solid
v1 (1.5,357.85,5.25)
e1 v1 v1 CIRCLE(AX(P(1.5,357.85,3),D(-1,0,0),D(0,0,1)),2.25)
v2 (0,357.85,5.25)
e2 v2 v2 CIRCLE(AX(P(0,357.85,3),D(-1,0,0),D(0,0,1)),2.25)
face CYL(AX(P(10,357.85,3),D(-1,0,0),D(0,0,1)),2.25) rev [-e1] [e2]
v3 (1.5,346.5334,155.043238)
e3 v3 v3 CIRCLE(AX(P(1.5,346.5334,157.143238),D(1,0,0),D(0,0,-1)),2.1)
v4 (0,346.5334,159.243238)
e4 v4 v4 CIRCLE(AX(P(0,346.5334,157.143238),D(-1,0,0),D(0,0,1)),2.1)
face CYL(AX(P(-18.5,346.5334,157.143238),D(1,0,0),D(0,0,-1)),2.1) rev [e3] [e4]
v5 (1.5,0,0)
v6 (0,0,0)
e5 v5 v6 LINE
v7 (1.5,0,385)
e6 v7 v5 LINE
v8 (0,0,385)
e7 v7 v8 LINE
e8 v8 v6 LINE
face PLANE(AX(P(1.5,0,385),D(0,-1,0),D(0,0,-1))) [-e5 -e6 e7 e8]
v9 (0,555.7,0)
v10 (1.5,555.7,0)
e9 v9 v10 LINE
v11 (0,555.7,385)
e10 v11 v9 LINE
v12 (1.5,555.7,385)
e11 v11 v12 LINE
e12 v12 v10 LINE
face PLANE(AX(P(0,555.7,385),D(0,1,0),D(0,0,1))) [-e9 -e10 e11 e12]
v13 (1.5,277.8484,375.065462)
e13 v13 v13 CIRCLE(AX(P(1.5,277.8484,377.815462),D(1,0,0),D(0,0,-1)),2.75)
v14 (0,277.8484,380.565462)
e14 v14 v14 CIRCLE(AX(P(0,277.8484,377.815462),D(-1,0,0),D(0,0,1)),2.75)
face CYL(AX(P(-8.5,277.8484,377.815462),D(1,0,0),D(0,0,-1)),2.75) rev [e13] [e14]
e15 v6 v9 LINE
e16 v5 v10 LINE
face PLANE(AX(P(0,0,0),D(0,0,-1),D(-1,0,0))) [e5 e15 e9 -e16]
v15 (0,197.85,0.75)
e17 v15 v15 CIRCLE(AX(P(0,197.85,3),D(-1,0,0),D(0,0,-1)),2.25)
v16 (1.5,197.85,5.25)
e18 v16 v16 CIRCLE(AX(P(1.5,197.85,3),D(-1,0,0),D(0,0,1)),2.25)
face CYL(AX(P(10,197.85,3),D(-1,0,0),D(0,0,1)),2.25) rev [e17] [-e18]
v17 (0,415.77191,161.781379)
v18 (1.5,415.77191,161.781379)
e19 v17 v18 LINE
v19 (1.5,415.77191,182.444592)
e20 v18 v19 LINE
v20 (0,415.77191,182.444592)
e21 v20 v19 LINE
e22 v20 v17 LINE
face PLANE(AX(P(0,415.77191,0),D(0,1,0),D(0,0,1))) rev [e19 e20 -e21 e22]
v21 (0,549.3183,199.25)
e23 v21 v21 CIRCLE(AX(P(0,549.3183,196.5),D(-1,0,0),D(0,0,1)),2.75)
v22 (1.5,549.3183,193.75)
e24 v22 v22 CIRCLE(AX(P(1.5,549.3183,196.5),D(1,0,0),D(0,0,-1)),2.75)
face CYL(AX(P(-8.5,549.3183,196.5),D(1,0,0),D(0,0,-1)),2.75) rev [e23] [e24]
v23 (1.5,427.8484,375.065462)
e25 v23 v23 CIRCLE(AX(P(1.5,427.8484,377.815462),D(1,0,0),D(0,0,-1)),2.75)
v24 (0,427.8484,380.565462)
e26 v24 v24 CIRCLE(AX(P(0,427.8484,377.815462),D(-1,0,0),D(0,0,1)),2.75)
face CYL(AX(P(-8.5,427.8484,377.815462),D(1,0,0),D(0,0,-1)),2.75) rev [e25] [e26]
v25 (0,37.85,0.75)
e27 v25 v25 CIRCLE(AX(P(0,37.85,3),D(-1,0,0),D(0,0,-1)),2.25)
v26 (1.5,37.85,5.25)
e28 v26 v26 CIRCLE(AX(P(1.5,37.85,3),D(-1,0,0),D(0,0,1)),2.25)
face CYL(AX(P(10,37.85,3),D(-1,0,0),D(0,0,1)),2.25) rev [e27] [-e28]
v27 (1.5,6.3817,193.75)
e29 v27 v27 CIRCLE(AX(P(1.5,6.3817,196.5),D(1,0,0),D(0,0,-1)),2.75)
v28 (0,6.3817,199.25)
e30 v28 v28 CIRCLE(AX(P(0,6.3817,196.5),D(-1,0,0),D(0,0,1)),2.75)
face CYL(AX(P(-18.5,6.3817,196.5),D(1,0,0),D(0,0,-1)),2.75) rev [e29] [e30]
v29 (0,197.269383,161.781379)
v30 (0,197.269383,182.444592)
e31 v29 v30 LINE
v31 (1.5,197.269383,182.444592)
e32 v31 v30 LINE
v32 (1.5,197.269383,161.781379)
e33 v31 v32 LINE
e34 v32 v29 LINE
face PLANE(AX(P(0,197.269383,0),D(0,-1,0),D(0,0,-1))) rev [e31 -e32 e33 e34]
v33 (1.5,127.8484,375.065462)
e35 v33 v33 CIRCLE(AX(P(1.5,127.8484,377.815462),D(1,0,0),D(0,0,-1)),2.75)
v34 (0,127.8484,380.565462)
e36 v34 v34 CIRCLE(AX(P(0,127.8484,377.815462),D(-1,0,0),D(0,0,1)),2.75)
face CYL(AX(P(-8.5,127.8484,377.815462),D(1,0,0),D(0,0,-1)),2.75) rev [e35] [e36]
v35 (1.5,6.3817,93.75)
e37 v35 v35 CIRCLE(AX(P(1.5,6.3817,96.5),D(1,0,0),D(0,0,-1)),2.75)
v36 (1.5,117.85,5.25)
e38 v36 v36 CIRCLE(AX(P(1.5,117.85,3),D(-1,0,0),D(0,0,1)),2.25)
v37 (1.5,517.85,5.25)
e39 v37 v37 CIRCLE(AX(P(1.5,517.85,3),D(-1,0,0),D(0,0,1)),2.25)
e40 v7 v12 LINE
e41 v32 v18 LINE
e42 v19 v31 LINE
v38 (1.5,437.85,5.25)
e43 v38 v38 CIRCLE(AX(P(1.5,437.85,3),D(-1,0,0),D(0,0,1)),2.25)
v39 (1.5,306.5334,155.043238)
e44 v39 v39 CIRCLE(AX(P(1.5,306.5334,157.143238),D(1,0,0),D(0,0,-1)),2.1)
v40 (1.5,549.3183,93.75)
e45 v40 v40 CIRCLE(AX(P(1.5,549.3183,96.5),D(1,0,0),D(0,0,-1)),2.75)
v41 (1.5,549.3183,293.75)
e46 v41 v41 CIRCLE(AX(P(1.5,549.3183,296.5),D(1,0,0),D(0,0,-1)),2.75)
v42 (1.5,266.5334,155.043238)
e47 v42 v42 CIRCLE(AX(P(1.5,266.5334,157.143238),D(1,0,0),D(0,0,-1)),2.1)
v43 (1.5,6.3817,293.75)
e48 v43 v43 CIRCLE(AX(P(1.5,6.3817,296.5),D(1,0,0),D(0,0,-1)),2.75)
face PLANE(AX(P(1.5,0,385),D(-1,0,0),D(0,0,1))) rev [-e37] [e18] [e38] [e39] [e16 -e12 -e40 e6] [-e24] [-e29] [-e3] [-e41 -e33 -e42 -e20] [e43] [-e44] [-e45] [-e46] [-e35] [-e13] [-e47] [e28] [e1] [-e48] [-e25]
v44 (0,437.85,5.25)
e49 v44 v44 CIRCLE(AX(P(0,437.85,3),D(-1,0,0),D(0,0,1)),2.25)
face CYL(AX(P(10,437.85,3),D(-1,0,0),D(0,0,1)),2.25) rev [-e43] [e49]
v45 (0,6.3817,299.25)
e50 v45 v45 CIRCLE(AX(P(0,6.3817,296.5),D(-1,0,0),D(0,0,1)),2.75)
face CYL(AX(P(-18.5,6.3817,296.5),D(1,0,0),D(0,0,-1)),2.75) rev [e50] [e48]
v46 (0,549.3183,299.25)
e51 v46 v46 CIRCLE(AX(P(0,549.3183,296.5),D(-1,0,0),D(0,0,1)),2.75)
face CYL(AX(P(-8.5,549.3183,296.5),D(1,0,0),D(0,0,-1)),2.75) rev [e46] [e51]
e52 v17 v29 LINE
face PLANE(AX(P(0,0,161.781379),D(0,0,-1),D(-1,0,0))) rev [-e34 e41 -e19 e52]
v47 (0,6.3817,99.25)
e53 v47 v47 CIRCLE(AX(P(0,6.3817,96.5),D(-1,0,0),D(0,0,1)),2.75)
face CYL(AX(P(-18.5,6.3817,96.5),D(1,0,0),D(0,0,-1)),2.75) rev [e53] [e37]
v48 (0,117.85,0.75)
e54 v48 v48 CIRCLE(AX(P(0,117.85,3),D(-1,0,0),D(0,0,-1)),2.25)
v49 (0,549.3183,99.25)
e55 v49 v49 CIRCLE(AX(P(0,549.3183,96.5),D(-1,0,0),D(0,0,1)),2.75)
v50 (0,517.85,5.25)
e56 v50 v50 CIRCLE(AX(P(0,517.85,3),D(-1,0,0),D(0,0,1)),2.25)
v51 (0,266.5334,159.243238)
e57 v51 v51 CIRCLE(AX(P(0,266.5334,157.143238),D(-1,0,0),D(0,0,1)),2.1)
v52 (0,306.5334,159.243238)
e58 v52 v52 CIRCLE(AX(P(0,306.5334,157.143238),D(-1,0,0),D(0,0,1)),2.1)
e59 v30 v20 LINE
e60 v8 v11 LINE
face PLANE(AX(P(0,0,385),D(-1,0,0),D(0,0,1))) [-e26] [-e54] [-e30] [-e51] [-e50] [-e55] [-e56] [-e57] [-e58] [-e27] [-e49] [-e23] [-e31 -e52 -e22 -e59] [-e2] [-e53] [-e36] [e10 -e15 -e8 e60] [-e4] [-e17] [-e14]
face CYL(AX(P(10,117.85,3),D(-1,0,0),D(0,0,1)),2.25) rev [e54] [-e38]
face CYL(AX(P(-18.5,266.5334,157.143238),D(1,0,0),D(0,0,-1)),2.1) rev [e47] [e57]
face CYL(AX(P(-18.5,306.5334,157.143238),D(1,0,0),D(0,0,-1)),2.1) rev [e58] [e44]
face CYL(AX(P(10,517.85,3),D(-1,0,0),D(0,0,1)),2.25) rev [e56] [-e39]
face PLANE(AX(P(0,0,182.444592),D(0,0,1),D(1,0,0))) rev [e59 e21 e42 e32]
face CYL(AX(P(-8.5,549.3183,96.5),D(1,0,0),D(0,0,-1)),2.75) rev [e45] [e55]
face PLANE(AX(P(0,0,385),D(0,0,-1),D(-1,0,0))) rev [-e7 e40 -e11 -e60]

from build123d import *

# Parameters (mm, degrees)
SKETCH_1_W             = 1.5
SKETCH_1_H             = 555.7
SM_BASE_FLANGE_1_DEPTH = 385
SKETCH_6_W             = 88.363212941
SKETCH_6_H             = 264.50252719
CUT_EXTRUDE_1_DEPTH    = 74.5
SKETCH_7_W             = 1.5
SKETCH_7_H             = 264.50252719
EXTRUDE_1_DEPTH        = 47.7
SKETCH_8_W             = 1.5
SKETCH_8_H             = 40.663212941
EXTRUDE_2_DEPTH        = 20
SKETCH_9_W             = 1.5
SKETCH_9_H             = 40.663212941
EXTRUDE_3_DEPTH        = 26
SKETCH_10_W            = 1.5
SKETCH_10_H            = 218.50252719
EXTRUDE_4_DEPTH        = 20
SKETCH_12_R            = 2.75
CUT_EXTRUDE_2_DEPTH    = 20
SKETCH_13_R            = 2.75
CUT_EXTRUDE_3_DEPTH    = 10
SKETCH_14_R            = 2.75
CUT_EXTRUDE_4_DEPTH    = 10
SKETCH_15_R            = 2.25
CUT_EXTRUDE_5_DEPTH    = 10
SKETCH_17_R            = 2.1
CUT_EXTRUDE_6_DEPTH    = 20


# Sheet-metal steps are written as plain solids
with BuildPart() as part:
    # Sketch 1 → 基体-法兰1 (new body)
    with BuildSketch(Plane.XY):
        with Locations((0.75, 277.85)):
            Rectangle(SKETCH_1_W, SKETCH_1_H)
    extrude(amount=SM_BASE_FLANGE_1_DEPTH)

    # 草图6 → 切除-拉伸1 (cut)
    with BuildSketch(Plane.ZY):
        with Locations((158.262985354, 303.520646834)):
            Rectangle(SKETCH_6_W, SKETCH_6_H)
    extrude(amount=-CUT_EXTRUDE_1_DEPTH, mode=Mode.SUBTRACT)

    # 草图7 → 凸台-拉伸1 (add)
    with BuildSketch(Plane.XY.offset(114.081378883)):
        with Locations((0.75, 303.520646834)):
            Rectangle(SKETCH_7_W, SKETCH_7_H)
    extrude(amount=EXTRUDE_1_DEPTH)

    # 草图8 → 凸台-拉伸2 (add)
    with BuildSketch(Plane.XZ.offset(-435.771910429)):
        with Locations((0.75, 182.112985353)):
            Rectangle(SKETCH_8_W, SKETCH_8_H)
    extrude(amount=EXTRUDE_2_DEPTH)

    # 草图9 → 凸台-拉伸3 (add)
    with BuildSketch(Plane(origin=(0, 171.269383239, 0), x_dir=(1, 0, 0), z_dir=(0, 1, 0))):
        with Locations((0.75, -182.112985353)):
            Rectangle(SKETCH_9_W, SKETCH_9_H)
    extrude(amount=EXTRUDE_3_DEPTH)

    # 草图10 → 凸台-拉伸4 (add)
    with BuildSketch(Plane(origin=(0, 0, 202.444591824), x_dir=(-1, 0, 0), z_dir=(0, 0, -1))):
        with Locations((-0.75, 306.520646834)):
            Rectangle(SKETCH_10_W, SKETCH_10_H)
    extrude(amount=EXTRUDE_4_DEPTH)

    # 草图12 → 切除-拉伸2 (cut)
    with BuildSketch(Plane(origin=(1.5, 0, 0), x_dir=(0, 0, -1), z_dir=(1, 0, 0))):
        with Locations((-296.5, 6.3817)):
            Circle(SKETCH_12_R)
        with Locations((-196.5, 6.3817)):
            Circle(SKETCH_12_R)
        with Locations((-96.5, 6.3817)):
            Circle(SKETCH_12_R)
    extrude(amount=-CUT_EXTRUDE_2_DEPTH, mode=Mode.SUBTRACT)

    # 草图13 → 切除-拉伸3 (cut)
    with BuildSketch(Plane(origin=(1.5, 0, 0), x_dir=(0, 0, -1), z_dir=(1, 0, 0))):
        with Locations((-377.815462169, 127.8484)):
            Circle(SKETCH_13_R)
        with Locations((-377.815462169, 277.8484)):
            Circle(SKETCH_13_R)
        with Locations((-377.815462169, 427.8484)):
            Circle(SKETCH_13_R)
    extrude(amount=-CUT_EXTRUDE_3_DEPTH, mode=Mode.SUBTRACT)

    # 草图14 → 切除-拉伸4 (cut)
    with BuildSketch(Plane(origin=(1.5, 0, 0), x_dir=(0, 0, -1), z_dir=(1, 0, 0))):
        with Locations((-296.5, 549.3183)):
            Circle(SKETCH_14_R)
        with Locations((-196.5, 549.3183)):
            Circle(SKETCH_14_R)
        with Locations((-96.5, 549.3183)):
            Circle(SKETCH_14_R)
    extrude(amount=-CUT_EXTRUDE_4_DEPTH, mode=Mode.SUBTRACT)

    # 草图15 → 切除-拉伸5 (cut)
    with BuildSketch(Plane.ZY):
        with Locations((3, 517.85)):
            Circle(SKETCH_15_R)
        with Locations((3, 437.85)):
            Circle(SKETCH_15_R)
        with Locations((3, 357.85)):
            Circle(SKETCH_15_R)
        with Locations((3, 37.85)):
            Circle(SKETCH_15_R)
        with Locations((3, 117.85)):
            Circle(SKETCH_15_R)
        with Locations((3, 197.85)):
            Circle(SKETCH_15_R)
    extrude(amount=-CUT_EXTRUDE_5_DEPTH, mode=Mode.SUBTRACT)

    # 草图17 → 切除-拉伸6 (cut)
    with BuildSketch(Plane(origin=(1.5, 0, 0), x_dir=(0, 0, -1), z_dir=(1, 0, 0))):
        with Locations((-157.14323819, 266.5334)):
            Circle(SKETCH_17_R)
        with Locations((-157.14323819, 306.5334)):
            Circle(SKETCH_17_R)
        with Locations((-157.14323819, 346.5334)):
            Circle(SKETCH_17_R)
    extrude(amount=-CUT_EXTRUDE_6_DEPTH, mode=Mode.SUBTRACT)


solid = part.part
